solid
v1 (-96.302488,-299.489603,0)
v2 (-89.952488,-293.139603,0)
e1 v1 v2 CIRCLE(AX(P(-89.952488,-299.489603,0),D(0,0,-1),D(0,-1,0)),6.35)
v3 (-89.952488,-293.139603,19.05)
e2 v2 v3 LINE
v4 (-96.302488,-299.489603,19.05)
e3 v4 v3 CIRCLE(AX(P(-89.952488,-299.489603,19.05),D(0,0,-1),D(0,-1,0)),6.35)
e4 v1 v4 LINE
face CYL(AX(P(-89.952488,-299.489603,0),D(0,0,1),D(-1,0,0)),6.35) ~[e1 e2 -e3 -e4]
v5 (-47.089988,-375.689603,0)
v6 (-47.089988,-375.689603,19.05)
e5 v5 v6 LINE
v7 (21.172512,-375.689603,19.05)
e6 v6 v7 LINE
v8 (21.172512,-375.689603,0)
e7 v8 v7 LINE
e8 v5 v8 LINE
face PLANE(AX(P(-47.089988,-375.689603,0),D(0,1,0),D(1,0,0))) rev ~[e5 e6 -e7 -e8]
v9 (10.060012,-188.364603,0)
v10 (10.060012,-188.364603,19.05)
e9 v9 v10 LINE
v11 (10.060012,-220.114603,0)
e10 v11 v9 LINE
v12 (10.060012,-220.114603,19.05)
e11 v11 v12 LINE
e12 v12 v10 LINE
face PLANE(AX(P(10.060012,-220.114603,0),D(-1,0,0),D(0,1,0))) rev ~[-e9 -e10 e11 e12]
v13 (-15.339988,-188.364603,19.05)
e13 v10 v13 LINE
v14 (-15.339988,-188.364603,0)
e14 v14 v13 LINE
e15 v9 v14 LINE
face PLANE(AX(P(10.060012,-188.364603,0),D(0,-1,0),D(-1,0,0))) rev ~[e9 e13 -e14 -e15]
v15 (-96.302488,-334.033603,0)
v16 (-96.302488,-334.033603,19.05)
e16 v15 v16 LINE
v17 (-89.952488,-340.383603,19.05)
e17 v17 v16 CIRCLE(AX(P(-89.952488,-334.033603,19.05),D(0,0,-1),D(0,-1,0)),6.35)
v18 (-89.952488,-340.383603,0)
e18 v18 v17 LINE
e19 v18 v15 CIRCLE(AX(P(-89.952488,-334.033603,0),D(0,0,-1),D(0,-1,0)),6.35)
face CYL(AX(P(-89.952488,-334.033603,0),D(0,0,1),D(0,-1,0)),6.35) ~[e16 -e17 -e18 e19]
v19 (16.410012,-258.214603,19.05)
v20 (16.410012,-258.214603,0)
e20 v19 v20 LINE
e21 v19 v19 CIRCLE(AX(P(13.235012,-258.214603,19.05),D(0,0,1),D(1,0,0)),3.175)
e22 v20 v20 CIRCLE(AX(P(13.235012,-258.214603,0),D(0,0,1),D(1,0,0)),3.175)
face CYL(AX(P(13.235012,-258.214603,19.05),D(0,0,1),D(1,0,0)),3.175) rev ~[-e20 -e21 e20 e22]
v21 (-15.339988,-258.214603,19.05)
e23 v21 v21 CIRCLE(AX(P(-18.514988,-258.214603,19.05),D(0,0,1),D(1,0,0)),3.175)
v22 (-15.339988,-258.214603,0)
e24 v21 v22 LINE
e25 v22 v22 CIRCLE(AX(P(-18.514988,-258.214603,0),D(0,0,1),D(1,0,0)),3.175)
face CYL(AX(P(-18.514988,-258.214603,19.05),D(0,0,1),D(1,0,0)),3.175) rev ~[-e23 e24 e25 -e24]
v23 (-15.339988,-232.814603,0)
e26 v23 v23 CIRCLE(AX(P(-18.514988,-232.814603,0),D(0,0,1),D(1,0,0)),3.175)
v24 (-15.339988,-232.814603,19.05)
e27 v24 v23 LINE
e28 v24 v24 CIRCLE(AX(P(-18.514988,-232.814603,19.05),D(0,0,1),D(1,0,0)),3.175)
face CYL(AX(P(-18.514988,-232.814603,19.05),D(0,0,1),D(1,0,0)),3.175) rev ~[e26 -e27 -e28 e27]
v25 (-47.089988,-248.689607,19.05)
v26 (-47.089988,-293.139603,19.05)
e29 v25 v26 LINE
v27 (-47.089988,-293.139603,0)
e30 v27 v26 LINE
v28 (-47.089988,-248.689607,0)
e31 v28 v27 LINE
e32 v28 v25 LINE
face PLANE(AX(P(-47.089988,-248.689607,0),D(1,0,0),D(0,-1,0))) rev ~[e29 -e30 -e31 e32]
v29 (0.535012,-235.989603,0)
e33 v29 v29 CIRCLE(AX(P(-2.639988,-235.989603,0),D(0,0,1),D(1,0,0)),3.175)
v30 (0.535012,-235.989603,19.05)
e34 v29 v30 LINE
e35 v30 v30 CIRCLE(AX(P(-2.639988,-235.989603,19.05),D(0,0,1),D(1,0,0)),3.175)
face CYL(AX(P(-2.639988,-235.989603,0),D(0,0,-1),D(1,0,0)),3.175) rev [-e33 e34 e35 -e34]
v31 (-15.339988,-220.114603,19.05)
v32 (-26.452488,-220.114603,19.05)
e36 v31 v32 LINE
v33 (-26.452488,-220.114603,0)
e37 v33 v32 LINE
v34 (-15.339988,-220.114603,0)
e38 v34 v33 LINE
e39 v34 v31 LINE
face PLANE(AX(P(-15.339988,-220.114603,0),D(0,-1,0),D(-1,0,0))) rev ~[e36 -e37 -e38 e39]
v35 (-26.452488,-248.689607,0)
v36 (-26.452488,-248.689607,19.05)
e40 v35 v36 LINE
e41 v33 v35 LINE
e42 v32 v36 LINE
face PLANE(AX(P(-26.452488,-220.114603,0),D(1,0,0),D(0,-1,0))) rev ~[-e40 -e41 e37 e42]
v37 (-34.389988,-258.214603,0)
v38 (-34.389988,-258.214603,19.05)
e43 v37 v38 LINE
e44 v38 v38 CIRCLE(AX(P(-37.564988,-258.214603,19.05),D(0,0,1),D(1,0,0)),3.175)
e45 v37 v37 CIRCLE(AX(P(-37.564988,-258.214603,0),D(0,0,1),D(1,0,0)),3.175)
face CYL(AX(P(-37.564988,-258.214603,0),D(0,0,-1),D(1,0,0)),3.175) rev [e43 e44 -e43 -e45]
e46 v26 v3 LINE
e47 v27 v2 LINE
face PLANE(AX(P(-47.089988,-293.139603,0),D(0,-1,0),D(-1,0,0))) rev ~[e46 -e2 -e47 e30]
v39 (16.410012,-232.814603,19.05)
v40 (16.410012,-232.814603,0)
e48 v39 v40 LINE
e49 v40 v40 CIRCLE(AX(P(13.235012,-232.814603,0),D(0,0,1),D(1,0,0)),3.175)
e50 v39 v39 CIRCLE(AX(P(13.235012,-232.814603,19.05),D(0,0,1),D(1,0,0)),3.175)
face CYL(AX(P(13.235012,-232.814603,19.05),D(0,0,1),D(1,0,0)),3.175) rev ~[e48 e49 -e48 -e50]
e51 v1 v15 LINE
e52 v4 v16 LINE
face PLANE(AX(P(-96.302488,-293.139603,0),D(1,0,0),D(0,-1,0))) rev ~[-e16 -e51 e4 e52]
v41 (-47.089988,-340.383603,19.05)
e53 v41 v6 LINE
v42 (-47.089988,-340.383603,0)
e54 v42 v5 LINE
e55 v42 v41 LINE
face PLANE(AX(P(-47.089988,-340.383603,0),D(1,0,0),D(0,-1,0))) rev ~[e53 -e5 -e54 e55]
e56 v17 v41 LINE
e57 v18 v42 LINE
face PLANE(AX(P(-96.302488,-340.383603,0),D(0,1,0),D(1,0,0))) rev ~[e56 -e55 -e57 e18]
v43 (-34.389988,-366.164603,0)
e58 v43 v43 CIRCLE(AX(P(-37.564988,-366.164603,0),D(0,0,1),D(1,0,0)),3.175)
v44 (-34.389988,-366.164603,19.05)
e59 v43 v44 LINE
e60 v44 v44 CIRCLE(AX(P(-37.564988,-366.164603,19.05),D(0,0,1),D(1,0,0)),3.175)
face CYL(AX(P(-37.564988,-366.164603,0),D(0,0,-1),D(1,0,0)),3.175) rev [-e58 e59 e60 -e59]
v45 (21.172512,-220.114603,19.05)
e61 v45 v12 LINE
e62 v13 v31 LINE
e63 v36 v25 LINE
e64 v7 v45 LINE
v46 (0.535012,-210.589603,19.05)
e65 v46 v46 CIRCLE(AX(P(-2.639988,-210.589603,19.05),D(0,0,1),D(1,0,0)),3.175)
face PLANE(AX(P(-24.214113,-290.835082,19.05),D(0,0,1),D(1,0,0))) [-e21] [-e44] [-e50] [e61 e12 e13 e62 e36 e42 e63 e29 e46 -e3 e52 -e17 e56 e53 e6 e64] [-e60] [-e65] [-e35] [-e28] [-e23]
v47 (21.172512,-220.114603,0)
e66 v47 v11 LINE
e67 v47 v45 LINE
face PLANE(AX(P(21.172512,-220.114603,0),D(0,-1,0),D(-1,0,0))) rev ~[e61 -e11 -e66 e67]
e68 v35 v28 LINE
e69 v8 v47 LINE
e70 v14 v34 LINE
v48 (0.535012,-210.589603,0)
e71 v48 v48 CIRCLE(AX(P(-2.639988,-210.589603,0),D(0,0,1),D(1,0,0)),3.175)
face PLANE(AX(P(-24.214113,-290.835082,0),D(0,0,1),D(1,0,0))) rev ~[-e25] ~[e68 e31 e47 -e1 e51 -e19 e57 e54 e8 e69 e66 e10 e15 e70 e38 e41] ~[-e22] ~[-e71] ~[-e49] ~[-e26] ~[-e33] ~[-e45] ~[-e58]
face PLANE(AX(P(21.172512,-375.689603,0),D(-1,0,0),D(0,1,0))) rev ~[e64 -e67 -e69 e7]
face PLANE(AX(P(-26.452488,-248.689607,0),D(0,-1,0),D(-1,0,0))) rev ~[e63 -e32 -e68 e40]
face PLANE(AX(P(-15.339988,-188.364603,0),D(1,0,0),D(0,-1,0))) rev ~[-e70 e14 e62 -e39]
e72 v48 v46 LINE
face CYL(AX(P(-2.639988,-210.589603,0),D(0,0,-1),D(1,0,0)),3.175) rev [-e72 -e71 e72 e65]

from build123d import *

# Parameters (mm, degrees)
F0_R     = 3.175
F1_DEPTH = 19.05
F2_R     = 3.175
F3_DEPTH = 25.4
F4_R     = 6.35


with BuildPart() as f1:
    # F0 (on Top) → F1 (new body)
    with BuildSketch(Plane.XY):
        Polygon((21.1725122346, -375.6896027952), (21.1725122346, -220.1146027952), (10.0600122346, -220.1146027952), (10.0600122346, -188.3646027952), (-15.3399877654, -188.3646027952), (-15.3399877654, -210.5896027952), (-15.3399877654, -220.1146027952), (-26.4524877654, -220.1146027952), (-26.4524877654, -248.6896067858), (-47.0899877654, -248.6896067858), (-47.0899877654, -293.1396027952), (-96.3024877654, -293.1396027952), (-96.3024877654, -314.9836027952), (-96.3024877654, -340.3836027952), (-47.0899877654, -340.3836027952), (-47.0899877654, -375.6896027952), (-26.4524877654, -375.6896027952), (-13.7524877654, -375.6896027952), align=None)
        with Locations((-37.5649877654, -366.1646027952)):
            Circle(F0_R, mode=Mode.SUBTRACT)
        with Locations((-37.5649877654, -258.2146027952)):
            Circle(F0_R, mode=Mode.SUBTRACT)
        with Locations((-2.6399877654, -235.9896027952)):
            Circle(F0_R, mode=Mode.SUBTRACT)
        with Locations((-2.6399877654, -210.5896027952)):
            Circle(F0_R, mode=Mode.SUBTRACT)
    extrude(amount=F1_DEPTH)

    # F2 (on face) → F3 (cut)
    with BuildSketch(Plane.XY.offset(19.05)):
        with Locations((-18.5149877654, -232.8146027952)):
            Circle(F2_R)
        with Locations((13.2350122346, -232.8146027952)):
            Circle(F2_R)
        with Locations((13.2350122346, -258.2146027952)):
            Circle(F2_R)
        with Locations((-18.5149877654, -258.2146027952)):
            Circle(F2_R)
    extrude(amount=-F3_DEPTH, mode=Mode.SUBTRACT)

    # F4
    f4_edges = [f1.edges().sort_by_distance(p)[0] for p in [
        (-96.302488, -340.383603, 9.525),
        (-96.302488, -293.139603, 9.525),
    ]]
    fillet(f4_edges, radius=F4_R)


solid = f1.part
